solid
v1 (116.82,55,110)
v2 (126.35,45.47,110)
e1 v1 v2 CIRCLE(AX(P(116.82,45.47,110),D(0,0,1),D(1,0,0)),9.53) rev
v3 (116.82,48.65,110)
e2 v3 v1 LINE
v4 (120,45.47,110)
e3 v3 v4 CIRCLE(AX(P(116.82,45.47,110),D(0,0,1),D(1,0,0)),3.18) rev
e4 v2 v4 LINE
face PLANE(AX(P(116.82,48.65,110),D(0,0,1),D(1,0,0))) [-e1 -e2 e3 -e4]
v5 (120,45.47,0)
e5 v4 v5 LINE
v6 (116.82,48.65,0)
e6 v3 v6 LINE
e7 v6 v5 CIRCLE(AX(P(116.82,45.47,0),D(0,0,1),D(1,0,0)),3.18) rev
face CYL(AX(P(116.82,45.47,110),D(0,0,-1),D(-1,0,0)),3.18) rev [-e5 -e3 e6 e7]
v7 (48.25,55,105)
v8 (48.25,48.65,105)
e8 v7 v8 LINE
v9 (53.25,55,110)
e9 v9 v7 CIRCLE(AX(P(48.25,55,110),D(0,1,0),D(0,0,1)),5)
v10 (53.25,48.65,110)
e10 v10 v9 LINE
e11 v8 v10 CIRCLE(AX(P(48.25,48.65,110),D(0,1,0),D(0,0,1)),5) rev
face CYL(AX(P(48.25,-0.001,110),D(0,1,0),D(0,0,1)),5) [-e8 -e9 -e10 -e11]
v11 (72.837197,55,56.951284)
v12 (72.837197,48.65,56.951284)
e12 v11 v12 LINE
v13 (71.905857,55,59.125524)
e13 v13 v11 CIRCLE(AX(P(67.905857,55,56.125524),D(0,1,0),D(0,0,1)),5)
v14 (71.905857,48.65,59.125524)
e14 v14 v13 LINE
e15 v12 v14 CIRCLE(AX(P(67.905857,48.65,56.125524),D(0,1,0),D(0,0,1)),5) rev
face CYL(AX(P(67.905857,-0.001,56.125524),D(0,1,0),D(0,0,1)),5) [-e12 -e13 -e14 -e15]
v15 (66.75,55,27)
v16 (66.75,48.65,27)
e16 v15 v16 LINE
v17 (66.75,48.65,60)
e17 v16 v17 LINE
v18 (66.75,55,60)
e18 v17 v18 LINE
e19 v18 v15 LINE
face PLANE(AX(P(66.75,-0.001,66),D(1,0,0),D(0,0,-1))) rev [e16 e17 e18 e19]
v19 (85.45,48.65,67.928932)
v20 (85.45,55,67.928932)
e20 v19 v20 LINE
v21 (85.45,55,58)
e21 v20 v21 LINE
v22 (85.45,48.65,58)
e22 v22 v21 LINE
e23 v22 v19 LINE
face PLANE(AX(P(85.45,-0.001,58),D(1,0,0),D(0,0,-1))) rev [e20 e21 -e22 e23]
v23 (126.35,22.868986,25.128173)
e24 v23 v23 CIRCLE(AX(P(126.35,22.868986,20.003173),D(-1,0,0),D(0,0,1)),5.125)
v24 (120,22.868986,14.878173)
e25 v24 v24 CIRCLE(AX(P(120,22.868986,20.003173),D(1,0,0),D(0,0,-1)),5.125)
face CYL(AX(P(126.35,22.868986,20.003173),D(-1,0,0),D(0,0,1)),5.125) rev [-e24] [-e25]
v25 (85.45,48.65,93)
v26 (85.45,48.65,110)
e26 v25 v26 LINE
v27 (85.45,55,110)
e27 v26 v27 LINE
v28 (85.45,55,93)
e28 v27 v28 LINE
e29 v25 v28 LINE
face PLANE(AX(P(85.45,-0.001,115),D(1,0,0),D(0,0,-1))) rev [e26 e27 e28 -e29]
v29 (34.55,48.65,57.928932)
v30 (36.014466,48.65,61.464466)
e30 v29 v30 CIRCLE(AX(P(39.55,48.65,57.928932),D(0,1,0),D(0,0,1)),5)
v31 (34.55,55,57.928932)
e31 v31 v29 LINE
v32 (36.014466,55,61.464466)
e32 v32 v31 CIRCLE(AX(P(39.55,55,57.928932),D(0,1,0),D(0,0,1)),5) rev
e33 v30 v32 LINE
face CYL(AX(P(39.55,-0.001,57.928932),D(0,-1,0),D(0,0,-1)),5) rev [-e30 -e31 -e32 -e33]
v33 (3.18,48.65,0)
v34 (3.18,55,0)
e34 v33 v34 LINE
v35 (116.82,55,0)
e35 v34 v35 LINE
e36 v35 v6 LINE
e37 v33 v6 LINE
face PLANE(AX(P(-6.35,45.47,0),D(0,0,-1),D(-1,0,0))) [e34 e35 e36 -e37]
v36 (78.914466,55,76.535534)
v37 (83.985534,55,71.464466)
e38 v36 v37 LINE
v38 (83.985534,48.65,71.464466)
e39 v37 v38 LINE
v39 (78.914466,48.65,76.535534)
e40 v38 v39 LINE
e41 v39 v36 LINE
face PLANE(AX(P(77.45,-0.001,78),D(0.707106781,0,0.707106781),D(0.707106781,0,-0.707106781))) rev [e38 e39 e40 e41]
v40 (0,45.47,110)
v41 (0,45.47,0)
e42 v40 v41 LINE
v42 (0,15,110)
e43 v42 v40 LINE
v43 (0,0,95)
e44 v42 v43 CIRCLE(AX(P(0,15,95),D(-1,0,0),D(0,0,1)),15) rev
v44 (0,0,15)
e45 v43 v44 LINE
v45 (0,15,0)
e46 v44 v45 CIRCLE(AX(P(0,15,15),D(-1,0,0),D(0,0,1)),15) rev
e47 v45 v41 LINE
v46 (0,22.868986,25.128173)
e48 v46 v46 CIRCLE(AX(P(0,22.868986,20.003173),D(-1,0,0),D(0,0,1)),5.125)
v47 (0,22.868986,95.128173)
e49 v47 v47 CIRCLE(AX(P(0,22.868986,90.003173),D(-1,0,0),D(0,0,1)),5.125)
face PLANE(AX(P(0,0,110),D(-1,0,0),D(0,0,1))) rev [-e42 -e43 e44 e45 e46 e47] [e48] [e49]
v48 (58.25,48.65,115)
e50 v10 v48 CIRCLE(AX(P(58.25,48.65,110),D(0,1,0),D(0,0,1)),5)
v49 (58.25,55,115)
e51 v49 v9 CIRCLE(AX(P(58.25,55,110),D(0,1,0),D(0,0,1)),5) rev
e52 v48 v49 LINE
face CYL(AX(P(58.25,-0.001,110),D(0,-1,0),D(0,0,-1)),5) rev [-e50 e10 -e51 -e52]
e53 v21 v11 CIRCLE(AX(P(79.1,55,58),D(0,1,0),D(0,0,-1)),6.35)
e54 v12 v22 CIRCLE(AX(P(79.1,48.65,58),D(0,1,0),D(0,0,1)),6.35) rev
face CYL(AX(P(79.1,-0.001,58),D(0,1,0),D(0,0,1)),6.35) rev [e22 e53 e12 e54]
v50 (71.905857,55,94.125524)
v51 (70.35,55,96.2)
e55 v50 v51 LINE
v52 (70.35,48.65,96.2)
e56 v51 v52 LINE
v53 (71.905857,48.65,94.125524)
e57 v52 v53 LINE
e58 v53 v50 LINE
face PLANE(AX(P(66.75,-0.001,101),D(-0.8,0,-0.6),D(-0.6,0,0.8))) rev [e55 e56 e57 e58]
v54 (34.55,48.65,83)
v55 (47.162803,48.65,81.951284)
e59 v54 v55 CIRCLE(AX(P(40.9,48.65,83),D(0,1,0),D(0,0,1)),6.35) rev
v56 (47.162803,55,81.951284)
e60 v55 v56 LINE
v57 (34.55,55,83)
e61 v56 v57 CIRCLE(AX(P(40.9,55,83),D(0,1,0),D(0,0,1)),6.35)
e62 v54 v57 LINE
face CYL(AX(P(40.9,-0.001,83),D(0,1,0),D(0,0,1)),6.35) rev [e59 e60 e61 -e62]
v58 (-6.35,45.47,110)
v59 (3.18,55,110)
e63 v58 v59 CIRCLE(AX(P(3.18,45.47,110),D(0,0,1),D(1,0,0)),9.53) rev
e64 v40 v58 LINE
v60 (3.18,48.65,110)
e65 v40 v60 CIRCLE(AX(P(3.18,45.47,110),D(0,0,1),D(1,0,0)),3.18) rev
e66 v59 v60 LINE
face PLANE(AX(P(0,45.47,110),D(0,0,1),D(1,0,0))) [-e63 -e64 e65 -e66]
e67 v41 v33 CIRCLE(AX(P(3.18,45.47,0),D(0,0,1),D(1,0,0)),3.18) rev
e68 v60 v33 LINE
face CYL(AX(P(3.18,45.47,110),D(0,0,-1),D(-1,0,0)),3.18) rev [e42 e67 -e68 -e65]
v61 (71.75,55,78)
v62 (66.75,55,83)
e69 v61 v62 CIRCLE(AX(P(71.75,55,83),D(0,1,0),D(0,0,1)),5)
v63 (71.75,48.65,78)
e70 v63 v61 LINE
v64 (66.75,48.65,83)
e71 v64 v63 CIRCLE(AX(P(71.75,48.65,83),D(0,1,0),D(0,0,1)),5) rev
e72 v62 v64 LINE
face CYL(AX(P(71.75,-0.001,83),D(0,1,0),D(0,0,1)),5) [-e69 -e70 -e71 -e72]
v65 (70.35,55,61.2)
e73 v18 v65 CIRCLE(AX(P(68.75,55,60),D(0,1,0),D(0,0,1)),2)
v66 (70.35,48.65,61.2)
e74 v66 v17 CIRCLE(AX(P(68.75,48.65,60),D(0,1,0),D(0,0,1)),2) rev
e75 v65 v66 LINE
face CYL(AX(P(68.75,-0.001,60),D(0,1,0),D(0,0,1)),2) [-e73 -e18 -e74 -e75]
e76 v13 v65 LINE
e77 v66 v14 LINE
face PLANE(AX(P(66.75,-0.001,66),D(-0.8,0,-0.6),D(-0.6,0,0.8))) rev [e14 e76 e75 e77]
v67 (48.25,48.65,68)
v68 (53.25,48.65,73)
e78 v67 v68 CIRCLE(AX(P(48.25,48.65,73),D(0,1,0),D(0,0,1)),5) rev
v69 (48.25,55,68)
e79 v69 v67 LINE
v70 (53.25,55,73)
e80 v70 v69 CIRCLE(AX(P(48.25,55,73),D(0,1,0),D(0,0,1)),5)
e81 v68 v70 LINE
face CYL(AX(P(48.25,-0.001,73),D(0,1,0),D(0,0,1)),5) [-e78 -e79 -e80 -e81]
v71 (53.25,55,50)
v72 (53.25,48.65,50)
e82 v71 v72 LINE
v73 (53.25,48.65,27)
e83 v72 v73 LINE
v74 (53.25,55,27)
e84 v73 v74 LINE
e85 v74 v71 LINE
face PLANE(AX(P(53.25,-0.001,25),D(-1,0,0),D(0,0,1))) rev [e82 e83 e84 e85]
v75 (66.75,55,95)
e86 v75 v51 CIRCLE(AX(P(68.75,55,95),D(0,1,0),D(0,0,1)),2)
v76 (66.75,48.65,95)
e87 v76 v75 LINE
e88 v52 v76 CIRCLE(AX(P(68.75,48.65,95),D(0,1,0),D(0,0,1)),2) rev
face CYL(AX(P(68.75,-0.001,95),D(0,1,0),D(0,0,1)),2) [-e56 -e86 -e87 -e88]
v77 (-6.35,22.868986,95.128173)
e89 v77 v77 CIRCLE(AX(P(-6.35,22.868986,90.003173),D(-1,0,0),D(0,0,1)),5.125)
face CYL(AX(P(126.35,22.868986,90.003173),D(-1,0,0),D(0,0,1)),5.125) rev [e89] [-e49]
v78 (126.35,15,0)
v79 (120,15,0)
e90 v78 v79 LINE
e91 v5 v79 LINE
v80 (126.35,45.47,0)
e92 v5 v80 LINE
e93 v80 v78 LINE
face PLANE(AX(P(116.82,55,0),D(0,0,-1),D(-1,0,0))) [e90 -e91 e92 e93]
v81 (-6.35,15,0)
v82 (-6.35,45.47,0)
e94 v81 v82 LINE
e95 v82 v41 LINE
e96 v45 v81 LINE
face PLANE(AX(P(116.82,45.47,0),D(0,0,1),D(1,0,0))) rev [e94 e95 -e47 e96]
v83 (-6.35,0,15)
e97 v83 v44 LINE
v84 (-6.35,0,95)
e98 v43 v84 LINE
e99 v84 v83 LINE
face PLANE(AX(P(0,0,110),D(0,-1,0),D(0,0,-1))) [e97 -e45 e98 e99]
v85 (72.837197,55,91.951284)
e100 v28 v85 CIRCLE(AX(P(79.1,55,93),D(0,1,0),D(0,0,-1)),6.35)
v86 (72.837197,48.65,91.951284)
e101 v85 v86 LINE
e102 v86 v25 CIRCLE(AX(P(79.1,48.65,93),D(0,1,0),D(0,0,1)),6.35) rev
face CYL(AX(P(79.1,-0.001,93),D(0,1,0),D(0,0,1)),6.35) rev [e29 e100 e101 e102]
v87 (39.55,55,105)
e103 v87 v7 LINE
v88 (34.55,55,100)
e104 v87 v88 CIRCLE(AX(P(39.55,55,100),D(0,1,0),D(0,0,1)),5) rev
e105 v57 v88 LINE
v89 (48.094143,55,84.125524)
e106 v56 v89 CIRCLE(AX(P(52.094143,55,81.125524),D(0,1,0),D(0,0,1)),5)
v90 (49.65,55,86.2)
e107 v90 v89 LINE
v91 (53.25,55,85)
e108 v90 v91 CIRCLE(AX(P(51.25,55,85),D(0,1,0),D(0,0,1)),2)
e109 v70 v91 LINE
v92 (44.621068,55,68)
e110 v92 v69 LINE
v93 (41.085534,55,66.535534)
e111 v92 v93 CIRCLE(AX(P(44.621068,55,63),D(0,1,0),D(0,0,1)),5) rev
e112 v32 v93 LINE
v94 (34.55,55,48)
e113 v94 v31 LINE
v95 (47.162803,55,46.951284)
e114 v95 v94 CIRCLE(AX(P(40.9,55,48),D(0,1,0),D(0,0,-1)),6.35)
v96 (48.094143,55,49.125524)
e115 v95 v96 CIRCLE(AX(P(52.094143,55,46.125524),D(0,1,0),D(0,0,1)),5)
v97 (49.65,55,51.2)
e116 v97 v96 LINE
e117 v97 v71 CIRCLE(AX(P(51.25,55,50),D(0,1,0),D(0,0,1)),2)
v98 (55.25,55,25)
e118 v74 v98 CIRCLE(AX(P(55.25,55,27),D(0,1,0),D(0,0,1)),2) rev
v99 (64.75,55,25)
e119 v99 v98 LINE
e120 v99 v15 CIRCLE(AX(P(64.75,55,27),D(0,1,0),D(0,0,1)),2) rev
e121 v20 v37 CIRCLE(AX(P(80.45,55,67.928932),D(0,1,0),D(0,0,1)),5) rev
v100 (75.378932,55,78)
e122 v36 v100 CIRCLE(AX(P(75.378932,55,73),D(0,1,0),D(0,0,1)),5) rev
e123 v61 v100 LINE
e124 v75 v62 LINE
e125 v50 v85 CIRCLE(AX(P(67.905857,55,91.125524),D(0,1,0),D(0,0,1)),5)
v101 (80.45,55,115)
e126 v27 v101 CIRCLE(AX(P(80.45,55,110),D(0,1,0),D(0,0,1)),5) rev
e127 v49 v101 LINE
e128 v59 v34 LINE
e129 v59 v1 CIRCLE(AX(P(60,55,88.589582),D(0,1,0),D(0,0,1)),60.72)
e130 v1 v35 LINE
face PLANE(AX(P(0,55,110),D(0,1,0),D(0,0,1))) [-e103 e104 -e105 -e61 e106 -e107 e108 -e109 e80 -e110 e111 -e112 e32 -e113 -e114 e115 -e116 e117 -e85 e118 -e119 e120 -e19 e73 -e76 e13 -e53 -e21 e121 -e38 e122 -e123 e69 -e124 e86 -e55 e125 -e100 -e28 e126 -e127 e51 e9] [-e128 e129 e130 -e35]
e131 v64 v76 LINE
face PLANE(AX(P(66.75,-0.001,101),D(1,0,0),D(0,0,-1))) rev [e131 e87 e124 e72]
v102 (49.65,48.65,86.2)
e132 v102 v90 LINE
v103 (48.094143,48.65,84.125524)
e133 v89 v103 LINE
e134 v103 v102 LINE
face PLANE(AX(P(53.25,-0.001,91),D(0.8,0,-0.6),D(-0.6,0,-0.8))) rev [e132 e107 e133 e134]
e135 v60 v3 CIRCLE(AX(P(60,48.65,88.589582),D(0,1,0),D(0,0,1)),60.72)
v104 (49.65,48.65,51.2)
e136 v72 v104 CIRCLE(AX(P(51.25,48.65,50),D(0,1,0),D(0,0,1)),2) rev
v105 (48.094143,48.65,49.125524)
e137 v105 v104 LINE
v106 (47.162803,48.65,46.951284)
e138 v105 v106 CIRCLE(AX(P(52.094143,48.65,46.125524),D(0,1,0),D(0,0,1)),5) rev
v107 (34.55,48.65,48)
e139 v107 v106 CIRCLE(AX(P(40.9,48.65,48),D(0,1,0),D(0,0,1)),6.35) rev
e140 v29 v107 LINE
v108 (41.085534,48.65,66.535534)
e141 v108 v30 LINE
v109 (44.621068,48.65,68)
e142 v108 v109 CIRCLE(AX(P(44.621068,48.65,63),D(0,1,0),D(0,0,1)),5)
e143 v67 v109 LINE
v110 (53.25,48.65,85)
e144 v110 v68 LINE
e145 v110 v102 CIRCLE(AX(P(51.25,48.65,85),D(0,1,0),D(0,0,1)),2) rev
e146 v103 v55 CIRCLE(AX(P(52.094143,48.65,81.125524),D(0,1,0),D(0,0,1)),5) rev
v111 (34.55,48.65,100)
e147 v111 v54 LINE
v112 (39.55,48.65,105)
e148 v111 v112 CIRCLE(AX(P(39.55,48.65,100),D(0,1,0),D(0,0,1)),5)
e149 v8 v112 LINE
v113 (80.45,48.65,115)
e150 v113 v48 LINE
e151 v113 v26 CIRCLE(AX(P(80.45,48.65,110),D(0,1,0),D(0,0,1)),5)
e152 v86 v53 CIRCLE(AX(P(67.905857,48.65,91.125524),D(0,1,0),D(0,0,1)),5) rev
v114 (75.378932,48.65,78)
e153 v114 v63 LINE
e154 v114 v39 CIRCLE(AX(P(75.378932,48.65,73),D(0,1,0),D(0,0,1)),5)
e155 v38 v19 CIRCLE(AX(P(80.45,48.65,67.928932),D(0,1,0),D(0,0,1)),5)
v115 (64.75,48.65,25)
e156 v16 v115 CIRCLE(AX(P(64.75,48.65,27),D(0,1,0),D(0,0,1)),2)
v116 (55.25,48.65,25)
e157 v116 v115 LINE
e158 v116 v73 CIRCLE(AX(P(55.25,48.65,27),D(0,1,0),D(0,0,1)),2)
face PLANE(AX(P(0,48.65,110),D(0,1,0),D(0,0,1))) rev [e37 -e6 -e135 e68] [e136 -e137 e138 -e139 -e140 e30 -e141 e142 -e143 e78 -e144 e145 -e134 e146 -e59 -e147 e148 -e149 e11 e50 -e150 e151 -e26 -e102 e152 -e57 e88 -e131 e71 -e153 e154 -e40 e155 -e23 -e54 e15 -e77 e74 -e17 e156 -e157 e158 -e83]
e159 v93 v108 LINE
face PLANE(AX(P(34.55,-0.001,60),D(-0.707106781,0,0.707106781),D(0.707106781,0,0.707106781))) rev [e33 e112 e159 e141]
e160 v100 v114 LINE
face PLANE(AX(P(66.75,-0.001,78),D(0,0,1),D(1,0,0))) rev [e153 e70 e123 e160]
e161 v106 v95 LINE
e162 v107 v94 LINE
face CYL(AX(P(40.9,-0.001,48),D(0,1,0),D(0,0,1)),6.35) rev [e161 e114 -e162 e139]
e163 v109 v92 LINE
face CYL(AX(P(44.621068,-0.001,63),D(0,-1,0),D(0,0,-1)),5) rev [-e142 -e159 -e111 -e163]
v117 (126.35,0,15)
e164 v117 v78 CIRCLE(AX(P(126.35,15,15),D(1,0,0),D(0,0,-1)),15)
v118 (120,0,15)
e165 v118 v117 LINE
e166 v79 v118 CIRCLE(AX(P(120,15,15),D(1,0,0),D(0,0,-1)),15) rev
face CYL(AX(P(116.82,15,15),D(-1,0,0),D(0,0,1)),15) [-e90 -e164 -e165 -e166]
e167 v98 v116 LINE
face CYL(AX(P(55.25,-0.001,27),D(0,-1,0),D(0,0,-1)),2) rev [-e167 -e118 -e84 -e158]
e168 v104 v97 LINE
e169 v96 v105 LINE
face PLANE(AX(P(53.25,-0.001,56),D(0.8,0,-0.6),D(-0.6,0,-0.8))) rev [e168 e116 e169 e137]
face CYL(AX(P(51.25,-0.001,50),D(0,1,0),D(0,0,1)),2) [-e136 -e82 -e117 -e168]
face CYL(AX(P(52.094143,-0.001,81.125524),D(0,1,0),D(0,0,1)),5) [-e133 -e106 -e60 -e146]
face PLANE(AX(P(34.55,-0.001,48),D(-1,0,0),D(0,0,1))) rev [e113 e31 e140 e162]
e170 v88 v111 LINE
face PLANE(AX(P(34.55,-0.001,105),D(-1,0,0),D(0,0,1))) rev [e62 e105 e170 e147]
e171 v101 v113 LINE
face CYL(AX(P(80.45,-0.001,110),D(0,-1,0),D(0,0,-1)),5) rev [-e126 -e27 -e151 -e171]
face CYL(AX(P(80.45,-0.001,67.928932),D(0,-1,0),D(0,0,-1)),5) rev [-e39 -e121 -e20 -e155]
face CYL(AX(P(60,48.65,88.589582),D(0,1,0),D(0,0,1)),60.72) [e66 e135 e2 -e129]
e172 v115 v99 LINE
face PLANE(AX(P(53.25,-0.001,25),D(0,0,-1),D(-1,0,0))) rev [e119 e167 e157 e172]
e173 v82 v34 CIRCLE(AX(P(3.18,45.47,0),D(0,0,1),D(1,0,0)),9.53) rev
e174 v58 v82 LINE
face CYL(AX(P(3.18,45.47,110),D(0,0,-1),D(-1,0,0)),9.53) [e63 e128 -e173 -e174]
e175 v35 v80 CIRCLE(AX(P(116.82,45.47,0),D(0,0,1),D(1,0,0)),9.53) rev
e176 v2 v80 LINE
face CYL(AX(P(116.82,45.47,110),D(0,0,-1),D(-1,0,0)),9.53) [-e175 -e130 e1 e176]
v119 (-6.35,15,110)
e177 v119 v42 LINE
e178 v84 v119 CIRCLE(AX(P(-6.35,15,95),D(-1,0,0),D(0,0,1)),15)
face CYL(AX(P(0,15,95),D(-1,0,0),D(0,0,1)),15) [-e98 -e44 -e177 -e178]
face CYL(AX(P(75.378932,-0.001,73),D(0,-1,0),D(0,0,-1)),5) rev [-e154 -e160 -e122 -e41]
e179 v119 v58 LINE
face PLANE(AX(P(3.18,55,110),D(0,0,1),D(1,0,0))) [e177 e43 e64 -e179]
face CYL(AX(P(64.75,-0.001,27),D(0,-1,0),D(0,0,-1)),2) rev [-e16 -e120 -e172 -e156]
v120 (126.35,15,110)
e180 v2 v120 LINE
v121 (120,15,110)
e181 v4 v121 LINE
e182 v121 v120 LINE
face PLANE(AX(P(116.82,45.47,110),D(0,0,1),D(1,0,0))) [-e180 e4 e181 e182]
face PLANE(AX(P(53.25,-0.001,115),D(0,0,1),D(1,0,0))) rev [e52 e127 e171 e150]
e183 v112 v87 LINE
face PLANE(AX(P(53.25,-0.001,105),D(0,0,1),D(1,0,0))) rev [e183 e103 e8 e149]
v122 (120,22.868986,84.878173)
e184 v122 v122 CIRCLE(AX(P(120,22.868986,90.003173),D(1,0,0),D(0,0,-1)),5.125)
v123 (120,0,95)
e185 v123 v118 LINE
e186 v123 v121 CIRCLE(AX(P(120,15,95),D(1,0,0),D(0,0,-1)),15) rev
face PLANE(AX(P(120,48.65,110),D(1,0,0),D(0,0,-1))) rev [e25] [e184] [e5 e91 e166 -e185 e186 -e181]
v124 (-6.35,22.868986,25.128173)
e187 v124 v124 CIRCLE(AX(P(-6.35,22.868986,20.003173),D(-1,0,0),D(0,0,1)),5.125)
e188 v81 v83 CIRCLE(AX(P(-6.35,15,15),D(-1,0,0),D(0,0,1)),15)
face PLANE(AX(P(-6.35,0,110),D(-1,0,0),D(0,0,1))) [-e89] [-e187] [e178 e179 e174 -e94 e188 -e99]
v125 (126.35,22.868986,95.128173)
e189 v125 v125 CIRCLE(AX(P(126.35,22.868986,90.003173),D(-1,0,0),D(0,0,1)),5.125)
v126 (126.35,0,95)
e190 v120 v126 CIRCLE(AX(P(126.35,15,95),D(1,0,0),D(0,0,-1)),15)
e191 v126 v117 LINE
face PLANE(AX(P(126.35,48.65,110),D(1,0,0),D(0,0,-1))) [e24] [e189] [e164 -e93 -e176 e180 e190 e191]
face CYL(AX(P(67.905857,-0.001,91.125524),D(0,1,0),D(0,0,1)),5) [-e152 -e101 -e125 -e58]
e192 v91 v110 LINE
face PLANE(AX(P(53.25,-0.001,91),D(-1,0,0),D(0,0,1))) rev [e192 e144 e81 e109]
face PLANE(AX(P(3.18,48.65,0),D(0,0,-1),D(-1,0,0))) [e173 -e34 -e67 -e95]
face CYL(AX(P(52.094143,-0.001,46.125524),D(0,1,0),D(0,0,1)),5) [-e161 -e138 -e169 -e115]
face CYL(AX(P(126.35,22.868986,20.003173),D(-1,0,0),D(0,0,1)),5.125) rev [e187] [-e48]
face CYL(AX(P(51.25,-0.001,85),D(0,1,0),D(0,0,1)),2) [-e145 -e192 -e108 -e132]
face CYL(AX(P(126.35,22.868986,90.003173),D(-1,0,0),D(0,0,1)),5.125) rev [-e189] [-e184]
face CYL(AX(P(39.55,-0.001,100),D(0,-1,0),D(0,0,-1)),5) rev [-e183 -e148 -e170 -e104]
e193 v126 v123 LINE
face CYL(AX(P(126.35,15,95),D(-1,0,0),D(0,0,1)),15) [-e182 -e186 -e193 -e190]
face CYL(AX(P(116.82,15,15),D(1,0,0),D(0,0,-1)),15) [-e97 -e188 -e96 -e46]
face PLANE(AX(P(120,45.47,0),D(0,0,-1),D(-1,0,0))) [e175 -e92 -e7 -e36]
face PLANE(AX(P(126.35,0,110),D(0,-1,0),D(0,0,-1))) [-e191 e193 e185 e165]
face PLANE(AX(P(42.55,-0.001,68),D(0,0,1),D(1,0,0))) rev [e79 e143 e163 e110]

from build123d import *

# Parameters (mm, degrees)
BRIDA_BASE1_DEPTH          = 110
PESTA_A1_DEPTH             = 6.35
CORTAR_EXTRUIR1_REACH      = 205.181
REDONDEO1_R                = 15
CORTAR_EXTRUIR3_DEPTH      = 204.181381454
CORTAR_EXTRUIR3_DEPTH_BACK = 204.181381454
CROQUIS11_R                = 5.125
REDONDEO2_R                = 2
REDONDEO3_R                = 5


# Sheet-metal steps are written as plain solids
with BuildPart() as part:
    # Croquis1 → Brida base1 (new body)
    with BuildSketch(Plane.XY):
        with BuildLine():
            Line((0, 0), (0, 45.47))
            ThreePointArc((0, 45.47), (0.931400436, 47.718599564), (3.18, 48.65))
            Line((3.18, 48.65), (116.82, 48.65))
            ThreePointArc((116.82, 48.65), (119.068599564, 47.718599564), (120, 45.47))
            Line((120, 45.47), (120, 0))
            Line((120, 0), (126.35, 0))
            Line((126.35, 0), (126.35, 45.47))
            ThreePointArc((126.35, 45.47), (123.558727625, 52.208727625), (116.82, 55))
            Line((116.82, 55), (3.18, 55))
            ThreePointArc((3.18, 55), (-3.558727625, 52.208727625), (-6.35, 45.47))
            Line((-6.35, 45.47), (-6.35, 0))
            Line((-6.35, 0), (0, 0))
        make_face()
    extrude(amount=BRIDA_BASE1_DEPTH)

    # Croquis6 → Pestaña1 (add)
    with BuildSketch(Plane(origin=(0, 55, 0), x_dir=(1, 0, 0), z_dir=(0, 1, 0))):
        with BuildLine():
            Line((3.18, -110), (116.82, -110))
            ThreePointArc((116.82, -110), (60, -149.309581975), (3.18, -110))
        make_face()
    extrude(amount=-PESTA_A1_DEPTH)

    # Croquis9 → Cortar-Extruir1 (cut, up to next)
    with BuildSketch(Plane(origin=(0, 55, 0), x_dir=(1, 0, 0), z_dir=(0, 1, 0)), mode=Mode.PRIVATE) as cortar_extruir1_sk1:
        with BuildLine():
            Line((53.25, -115), (85.45, -115))
            Line((85.45, -115), (85.45, -93))
            ThreePointArc((85.45, -93), (79.1, -86.65), (72.75, -93))
            Line((72.75, -93), (66.75, -101))
            Line((66.75, -101), (66.75, -78))
            Line((66.75, -78), (77.45, -78))
            Line((77.45, -78), (85.45, -70))
            Line((85.45, -70), (85.45, -58))
            ThreePointArc((85.45, -58), (79.1, -51.65), (72.75, -58))
            Line((72.75, -58), (66.75, -66))
            Line((66.75, -66), (66.75, -25))
            Line((66.75, -25), (53.25, -25))
            Line((53.25, -25), (53.25, -56))
            Line((53.25, -56), (47.25, -48))
            ThreePointArc((47.25, -48), (40.9, -41.65), (34.55, -48))
            Line((34.55, -48), (34.55, -60))
            Line((34.55, -60), (42.55, -68))
            Line((42.55, -68), (53.25, -68))
            Line((53.25, -68), (53.25, -91))
            Line((53.25, -91), (47.25, -83))
            ThreePointArc((47.25, -83), (40.9, -76.65), (34.55, -83))
            Line((34.55, -83), (34.55, -105))
            Line((34.55, -105), (53.25, -105))
            Line((53.25, -105), (53.25, -115))
        make_face()
    cortar_extruir1_tool1 = extrude(cortar_extruir1_sk1.sketch, amount=-CORTAR_EXTRUIR1_REACH, mode=Mode.PRIVATE) & part.part
    add(cortar_extruir1_tool1.solids().sort_by_distance((60, 55, 76.162835))[0], mode=Mode.SUBTRACT)

    # Redondeo1
    redondeo1_edges = [part.edges().sort_by_distance(p)[0] for p in [
        (-3.175, 0, 0),
        (123.175, 0, 0),
        (-3.175, 0, 110),
        (123.175, 0, 110),
    ]]
    fillet(redondeo1_edges, radius=REDONDEO1_R)

    # Croquis11 → Cortar-Extruir3 (cut, two sides: drawn at the far end of the back side and taken through both)
    with BuildSketch(Plane.ZY.offset(-120).offset(-CORTAR_EXTRUIR3_DEPTH_BACK)):
        with Locations((20.003172622, 22.868986368)):
            Circle(CROQUIS11_R)
        with Locations((90.003172622, 22.868986368)):
            Circle(CROQUIS11_R)
    extrude(amount=CORTAR_EXTRUIR3_DEPTH + CORTAR_EXTRUIR3_DEPTH_BACK, mode=Mode.SUBTRACT)

    # Redondeo2
    redondeo2_edges = [part.edges().sort_by_distance(p)[0] for p in [
        (53.25, 51.825, 56),
        (53.25, 51.825, 25),
        (66.75, 51.825, 25),
        (66.75, 51.825, 66),
        (66.75, 51.825, 101),
        (53.25, 51.825, 91),
    ]]
    fillet(redondeo2_edges, radius=REDONDEO2_R)

    # Redondeo3
    redondeo3_edges = [part.edges().sort_by_distance(p)[0] for p in [
        (34.55, 51.825, 60),
        (47.25, 51.825, 48),
        (72.75, 51.825, 58),
        (85.45, 51.825, 70),
        (77.45, 51.825, 78),
        (66.75, 51.825, 78),
        (72.75, 51.825, 93),
        (85.45, 51.825, 115),
        (53.25, 51.825, 115),
        (53.25, 51.825, 105),
        (34.55, 51.825, 105),
        (47.25, 51.825, 83),
        (53.25, 51.825, 68),
        (42.55, 51.825, 68),
    ]]
    fillet(redondeo3_edges, radius=REDONDEO3_R - 0.0001)  # a hair under: the kernel refuses the full size


solid = part.part
